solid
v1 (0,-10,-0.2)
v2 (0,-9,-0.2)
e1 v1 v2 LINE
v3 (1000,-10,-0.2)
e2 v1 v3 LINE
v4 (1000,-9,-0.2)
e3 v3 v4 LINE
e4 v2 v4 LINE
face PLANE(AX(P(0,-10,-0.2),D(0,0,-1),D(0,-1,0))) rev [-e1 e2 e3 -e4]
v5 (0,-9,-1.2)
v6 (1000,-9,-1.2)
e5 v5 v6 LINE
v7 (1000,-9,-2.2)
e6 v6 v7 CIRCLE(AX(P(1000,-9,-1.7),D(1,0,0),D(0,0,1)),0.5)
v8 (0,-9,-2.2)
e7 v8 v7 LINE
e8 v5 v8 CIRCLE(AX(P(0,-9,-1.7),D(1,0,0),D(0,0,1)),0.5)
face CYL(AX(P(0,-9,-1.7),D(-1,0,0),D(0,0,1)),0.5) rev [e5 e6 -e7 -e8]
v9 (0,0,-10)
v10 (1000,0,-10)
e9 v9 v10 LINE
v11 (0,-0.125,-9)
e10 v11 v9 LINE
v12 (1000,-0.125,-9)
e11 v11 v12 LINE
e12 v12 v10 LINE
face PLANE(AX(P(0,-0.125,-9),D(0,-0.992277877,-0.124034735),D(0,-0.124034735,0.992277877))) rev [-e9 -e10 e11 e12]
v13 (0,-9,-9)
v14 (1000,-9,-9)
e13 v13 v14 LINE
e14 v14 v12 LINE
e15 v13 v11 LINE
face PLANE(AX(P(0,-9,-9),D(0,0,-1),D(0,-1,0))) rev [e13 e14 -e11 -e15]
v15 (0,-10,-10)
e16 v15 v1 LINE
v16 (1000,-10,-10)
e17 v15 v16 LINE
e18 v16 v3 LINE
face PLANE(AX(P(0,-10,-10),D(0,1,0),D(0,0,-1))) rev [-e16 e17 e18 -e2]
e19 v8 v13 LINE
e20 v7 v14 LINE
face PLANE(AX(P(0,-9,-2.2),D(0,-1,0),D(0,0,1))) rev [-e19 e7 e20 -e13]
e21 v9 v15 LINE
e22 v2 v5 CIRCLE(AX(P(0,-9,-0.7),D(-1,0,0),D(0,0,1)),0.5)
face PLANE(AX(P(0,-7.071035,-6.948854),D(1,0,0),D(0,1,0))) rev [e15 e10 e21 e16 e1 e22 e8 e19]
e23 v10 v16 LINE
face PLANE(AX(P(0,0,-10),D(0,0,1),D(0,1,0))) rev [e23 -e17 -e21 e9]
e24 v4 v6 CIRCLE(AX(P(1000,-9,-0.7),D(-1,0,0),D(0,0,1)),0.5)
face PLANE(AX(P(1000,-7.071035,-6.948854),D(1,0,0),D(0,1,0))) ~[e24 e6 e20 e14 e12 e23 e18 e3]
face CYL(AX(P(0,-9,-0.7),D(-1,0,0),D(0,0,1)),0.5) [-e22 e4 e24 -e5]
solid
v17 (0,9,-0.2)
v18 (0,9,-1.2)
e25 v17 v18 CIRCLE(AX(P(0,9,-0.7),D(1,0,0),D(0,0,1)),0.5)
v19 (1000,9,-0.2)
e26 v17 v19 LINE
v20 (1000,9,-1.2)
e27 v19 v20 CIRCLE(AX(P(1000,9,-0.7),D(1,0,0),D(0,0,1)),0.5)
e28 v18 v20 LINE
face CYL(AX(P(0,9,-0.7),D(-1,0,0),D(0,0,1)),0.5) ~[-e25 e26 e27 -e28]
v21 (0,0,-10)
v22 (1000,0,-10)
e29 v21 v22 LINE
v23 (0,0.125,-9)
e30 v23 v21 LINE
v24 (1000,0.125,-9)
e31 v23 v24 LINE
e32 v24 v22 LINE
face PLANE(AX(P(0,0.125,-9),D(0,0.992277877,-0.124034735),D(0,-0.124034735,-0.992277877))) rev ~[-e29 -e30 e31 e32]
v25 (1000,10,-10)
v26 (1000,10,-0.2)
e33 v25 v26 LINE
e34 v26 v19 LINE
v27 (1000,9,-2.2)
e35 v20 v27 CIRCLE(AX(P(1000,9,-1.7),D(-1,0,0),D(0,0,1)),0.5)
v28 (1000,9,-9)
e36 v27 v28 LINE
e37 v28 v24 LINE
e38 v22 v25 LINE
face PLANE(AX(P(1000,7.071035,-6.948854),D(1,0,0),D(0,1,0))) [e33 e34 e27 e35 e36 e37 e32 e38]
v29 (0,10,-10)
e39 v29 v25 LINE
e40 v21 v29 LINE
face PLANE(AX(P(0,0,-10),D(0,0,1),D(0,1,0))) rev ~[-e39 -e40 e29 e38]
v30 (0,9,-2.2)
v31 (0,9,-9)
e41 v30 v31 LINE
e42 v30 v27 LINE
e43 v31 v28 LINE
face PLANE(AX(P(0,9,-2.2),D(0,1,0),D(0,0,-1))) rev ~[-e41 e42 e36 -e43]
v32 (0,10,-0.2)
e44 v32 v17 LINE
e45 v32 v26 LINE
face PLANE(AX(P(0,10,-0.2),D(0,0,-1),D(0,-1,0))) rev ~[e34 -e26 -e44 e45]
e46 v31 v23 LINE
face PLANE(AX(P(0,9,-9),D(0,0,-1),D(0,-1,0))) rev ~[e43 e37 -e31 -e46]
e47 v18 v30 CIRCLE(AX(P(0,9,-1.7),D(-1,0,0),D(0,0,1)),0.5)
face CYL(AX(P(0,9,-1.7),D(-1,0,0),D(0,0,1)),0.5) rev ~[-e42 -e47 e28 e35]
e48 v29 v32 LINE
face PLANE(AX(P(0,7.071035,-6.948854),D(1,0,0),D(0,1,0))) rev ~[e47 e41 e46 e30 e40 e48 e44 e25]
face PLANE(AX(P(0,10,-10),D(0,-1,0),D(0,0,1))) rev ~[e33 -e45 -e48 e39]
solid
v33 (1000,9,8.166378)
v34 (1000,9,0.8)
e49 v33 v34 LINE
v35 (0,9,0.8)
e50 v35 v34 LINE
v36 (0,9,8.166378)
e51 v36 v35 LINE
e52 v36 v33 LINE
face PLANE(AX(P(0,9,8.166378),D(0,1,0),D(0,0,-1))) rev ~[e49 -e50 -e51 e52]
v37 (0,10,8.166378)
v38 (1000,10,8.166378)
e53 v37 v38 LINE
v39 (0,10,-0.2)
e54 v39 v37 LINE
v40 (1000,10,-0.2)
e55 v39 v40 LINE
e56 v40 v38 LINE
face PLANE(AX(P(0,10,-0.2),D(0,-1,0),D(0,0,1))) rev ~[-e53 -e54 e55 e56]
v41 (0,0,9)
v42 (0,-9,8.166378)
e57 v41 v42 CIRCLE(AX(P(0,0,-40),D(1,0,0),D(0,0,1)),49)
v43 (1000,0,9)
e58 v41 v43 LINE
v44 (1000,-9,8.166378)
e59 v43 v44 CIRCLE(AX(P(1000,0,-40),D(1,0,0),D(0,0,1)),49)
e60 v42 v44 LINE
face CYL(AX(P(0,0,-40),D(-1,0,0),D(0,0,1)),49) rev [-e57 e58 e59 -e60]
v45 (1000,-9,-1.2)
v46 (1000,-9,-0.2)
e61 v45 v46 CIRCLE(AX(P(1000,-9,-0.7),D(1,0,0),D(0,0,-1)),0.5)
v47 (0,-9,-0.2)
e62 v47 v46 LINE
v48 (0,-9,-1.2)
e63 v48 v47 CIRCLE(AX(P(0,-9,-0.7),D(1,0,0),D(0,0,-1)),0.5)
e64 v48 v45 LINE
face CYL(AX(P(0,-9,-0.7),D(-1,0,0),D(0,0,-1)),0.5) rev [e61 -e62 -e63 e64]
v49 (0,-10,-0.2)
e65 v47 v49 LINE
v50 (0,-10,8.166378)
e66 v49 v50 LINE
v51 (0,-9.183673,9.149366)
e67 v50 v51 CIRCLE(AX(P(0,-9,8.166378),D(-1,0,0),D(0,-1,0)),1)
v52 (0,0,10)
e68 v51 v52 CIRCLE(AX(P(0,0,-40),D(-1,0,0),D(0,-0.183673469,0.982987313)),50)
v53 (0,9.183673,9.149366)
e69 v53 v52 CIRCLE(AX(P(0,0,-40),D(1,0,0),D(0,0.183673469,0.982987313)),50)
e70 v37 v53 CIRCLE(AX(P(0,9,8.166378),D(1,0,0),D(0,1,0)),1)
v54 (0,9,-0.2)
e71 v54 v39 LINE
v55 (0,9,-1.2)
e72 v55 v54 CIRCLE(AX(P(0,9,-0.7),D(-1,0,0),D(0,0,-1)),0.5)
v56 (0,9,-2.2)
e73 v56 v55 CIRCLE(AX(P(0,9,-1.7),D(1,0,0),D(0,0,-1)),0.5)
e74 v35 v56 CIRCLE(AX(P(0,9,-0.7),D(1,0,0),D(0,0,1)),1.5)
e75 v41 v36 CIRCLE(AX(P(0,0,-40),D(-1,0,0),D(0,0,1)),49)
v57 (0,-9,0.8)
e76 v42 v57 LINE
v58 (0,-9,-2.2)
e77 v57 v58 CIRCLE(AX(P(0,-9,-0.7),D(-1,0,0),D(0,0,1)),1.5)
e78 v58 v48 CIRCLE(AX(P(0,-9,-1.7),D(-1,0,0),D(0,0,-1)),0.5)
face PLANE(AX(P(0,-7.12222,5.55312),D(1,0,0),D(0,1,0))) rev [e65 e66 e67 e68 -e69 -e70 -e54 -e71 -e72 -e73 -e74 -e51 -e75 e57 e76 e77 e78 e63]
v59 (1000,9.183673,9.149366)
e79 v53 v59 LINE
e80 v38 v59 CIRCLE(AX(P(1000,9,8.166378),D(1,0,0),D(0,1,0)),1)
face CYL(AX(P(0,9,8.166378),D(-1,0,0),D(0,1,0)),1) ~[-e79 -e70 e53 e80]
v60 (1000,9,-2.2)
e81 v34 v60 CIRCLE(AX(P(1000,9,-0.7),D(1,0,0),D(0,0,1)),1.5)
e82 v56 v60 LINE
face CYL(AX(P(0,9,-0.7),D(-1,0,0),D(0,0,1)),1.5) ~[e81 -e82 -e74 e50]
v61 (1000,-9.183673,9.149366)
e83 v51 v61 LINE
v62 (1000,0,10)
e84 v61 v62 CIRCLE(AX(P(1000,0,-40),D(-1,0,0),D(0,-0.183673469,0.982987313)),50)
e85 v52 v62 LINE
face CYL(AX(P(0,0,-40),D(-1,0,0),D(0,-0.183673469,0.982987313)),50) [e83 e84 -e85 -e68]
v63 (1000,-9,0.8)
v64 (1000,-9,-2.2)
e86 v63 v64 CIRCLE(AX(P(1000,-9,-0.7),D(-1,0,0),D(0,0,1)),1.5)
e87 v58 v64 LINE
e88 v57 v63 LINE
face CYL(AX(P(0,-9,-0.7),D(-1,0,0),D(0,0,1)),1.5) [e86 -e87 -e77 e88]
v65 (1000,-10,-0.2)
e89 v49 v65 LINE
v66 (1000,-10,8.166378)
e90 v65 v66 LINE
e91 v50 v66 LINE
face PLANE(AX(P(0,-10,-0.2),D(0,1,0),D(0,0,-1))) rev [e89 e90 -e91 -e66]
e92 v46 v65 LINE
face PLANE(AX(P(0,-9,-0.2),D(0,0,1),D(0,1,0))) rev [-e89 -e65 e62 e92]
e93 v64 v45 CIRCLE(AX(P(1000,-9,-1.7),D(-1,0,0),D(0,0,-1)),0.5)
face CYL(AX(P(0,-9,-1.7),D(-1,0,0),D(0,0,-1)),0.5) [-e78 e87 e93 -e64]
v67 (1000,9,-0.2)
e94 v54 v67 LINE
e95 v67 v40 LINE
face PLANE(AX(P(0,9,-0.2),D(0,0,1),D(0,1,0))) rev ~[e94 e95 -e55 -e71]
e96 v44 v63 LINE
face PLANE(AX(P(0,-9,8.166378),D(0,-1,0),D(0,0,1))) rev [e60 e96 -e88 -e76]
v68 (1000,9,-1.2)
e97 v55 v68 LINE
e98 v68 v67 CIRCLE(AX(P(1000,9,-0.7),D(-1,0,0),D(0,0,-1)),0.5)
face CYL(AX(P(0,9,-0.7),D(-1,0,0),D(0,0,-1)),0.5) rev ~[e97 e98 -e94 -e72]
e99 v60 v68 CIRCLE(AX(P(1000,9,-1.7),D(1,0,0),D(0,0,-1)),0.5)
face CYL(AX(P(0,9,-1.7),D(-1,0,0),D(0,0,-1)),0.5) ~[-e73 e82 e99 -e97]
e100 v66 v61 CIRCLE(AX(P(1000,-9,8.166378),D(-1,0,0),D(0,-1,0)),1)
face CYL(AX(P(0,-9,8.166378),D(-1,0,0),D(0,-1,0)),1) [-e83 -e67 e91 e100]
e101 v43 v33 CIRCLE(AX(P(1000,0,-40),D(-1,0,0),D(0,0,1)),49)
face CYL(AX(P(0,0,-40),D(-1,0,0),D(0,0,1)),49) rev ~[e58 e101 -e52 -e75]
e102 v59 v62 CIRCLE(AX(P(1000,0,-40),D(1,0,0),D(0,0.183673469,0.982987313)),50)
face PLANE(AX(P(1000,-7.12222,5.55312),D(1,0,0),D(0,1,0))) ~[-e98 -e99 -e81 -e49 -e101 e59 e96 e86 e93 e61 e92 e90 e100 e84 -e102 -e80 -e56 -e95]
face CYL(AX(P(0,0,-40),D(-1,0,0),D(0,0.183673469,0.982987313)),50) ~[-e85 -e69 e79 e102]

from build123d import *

# Parameters (mm, degrees)
F2_DEPTH = 1000
F4_DEPTH = 1000


with BuildPart() as f2:
    # F1 (on Right) → F2 (new body)
    with BuildSketch(Plane.YZ):
        with BuildLine():
            Line((0.125, -9), (0, -10))
            Line((0, -10), (10, -10))
            Line((10, -10), (10, -0.2))
            Line((10, -0.2), (9, -0.2))
            ThreePointArc((9, -0.2), (8.5, -0.7), (9, -1.2))
            ThreePointArc((9, -1.2), (9.5, -1.7), (9, -2.2))
            Line((9, -2.2), (9, -9))
            Line((9, -9), (0.125, -9))
        make_face()
    extrude(amount=F2_DEPTH)


with BuildPart() as f4:
    # F3 (on Right) → F4 (new body)
    with BuildSketch(Plane.YZ):
        with BuildLine():
            Line((9, -0.2), (10, -0.2))
            Line((10, -0.2), (10, 8.1663783152))
            ThreePointArc((10, 8.1663783152), (9.7693092582, 8.8052548802), (9.1836734694, 9.1493656277))
            ThreePointArc((9.1836734694, 9.1493656277), (4.6114920912, 9.7868872364), (0, 10))
            Line((0, 10), (0, 9))
            ThreePointArc((0, 9), (4.5192622493, 8.7911494917), (9, 8.1663783152))
            Line((9, 8.1663783152), (9, 0.8))
            ThreePointArc((9, 0.8), (7.5, -0.7), (9, -2.2))
            ThreePointArc((9, -2.2), (9.5, -1.7), (9, -1.2))
            ThreePointArc((9, -1.2), (8.5, -0.7), (9, -0.2))
        make_face()
    extrude(amount=F4_DEPTH)

    # F6: F4 across plane


with BuildPart() as f5_1:
    # F5: instance of F2
    add(f2.part.mirror(Plane.XZ))


with BuildPart() as f4_1:
    add(f4.part)
    add(f4.part.mirror(Plane.XZ))


solid = Compound([f2.part, f5_1.part, f4_1.part])
